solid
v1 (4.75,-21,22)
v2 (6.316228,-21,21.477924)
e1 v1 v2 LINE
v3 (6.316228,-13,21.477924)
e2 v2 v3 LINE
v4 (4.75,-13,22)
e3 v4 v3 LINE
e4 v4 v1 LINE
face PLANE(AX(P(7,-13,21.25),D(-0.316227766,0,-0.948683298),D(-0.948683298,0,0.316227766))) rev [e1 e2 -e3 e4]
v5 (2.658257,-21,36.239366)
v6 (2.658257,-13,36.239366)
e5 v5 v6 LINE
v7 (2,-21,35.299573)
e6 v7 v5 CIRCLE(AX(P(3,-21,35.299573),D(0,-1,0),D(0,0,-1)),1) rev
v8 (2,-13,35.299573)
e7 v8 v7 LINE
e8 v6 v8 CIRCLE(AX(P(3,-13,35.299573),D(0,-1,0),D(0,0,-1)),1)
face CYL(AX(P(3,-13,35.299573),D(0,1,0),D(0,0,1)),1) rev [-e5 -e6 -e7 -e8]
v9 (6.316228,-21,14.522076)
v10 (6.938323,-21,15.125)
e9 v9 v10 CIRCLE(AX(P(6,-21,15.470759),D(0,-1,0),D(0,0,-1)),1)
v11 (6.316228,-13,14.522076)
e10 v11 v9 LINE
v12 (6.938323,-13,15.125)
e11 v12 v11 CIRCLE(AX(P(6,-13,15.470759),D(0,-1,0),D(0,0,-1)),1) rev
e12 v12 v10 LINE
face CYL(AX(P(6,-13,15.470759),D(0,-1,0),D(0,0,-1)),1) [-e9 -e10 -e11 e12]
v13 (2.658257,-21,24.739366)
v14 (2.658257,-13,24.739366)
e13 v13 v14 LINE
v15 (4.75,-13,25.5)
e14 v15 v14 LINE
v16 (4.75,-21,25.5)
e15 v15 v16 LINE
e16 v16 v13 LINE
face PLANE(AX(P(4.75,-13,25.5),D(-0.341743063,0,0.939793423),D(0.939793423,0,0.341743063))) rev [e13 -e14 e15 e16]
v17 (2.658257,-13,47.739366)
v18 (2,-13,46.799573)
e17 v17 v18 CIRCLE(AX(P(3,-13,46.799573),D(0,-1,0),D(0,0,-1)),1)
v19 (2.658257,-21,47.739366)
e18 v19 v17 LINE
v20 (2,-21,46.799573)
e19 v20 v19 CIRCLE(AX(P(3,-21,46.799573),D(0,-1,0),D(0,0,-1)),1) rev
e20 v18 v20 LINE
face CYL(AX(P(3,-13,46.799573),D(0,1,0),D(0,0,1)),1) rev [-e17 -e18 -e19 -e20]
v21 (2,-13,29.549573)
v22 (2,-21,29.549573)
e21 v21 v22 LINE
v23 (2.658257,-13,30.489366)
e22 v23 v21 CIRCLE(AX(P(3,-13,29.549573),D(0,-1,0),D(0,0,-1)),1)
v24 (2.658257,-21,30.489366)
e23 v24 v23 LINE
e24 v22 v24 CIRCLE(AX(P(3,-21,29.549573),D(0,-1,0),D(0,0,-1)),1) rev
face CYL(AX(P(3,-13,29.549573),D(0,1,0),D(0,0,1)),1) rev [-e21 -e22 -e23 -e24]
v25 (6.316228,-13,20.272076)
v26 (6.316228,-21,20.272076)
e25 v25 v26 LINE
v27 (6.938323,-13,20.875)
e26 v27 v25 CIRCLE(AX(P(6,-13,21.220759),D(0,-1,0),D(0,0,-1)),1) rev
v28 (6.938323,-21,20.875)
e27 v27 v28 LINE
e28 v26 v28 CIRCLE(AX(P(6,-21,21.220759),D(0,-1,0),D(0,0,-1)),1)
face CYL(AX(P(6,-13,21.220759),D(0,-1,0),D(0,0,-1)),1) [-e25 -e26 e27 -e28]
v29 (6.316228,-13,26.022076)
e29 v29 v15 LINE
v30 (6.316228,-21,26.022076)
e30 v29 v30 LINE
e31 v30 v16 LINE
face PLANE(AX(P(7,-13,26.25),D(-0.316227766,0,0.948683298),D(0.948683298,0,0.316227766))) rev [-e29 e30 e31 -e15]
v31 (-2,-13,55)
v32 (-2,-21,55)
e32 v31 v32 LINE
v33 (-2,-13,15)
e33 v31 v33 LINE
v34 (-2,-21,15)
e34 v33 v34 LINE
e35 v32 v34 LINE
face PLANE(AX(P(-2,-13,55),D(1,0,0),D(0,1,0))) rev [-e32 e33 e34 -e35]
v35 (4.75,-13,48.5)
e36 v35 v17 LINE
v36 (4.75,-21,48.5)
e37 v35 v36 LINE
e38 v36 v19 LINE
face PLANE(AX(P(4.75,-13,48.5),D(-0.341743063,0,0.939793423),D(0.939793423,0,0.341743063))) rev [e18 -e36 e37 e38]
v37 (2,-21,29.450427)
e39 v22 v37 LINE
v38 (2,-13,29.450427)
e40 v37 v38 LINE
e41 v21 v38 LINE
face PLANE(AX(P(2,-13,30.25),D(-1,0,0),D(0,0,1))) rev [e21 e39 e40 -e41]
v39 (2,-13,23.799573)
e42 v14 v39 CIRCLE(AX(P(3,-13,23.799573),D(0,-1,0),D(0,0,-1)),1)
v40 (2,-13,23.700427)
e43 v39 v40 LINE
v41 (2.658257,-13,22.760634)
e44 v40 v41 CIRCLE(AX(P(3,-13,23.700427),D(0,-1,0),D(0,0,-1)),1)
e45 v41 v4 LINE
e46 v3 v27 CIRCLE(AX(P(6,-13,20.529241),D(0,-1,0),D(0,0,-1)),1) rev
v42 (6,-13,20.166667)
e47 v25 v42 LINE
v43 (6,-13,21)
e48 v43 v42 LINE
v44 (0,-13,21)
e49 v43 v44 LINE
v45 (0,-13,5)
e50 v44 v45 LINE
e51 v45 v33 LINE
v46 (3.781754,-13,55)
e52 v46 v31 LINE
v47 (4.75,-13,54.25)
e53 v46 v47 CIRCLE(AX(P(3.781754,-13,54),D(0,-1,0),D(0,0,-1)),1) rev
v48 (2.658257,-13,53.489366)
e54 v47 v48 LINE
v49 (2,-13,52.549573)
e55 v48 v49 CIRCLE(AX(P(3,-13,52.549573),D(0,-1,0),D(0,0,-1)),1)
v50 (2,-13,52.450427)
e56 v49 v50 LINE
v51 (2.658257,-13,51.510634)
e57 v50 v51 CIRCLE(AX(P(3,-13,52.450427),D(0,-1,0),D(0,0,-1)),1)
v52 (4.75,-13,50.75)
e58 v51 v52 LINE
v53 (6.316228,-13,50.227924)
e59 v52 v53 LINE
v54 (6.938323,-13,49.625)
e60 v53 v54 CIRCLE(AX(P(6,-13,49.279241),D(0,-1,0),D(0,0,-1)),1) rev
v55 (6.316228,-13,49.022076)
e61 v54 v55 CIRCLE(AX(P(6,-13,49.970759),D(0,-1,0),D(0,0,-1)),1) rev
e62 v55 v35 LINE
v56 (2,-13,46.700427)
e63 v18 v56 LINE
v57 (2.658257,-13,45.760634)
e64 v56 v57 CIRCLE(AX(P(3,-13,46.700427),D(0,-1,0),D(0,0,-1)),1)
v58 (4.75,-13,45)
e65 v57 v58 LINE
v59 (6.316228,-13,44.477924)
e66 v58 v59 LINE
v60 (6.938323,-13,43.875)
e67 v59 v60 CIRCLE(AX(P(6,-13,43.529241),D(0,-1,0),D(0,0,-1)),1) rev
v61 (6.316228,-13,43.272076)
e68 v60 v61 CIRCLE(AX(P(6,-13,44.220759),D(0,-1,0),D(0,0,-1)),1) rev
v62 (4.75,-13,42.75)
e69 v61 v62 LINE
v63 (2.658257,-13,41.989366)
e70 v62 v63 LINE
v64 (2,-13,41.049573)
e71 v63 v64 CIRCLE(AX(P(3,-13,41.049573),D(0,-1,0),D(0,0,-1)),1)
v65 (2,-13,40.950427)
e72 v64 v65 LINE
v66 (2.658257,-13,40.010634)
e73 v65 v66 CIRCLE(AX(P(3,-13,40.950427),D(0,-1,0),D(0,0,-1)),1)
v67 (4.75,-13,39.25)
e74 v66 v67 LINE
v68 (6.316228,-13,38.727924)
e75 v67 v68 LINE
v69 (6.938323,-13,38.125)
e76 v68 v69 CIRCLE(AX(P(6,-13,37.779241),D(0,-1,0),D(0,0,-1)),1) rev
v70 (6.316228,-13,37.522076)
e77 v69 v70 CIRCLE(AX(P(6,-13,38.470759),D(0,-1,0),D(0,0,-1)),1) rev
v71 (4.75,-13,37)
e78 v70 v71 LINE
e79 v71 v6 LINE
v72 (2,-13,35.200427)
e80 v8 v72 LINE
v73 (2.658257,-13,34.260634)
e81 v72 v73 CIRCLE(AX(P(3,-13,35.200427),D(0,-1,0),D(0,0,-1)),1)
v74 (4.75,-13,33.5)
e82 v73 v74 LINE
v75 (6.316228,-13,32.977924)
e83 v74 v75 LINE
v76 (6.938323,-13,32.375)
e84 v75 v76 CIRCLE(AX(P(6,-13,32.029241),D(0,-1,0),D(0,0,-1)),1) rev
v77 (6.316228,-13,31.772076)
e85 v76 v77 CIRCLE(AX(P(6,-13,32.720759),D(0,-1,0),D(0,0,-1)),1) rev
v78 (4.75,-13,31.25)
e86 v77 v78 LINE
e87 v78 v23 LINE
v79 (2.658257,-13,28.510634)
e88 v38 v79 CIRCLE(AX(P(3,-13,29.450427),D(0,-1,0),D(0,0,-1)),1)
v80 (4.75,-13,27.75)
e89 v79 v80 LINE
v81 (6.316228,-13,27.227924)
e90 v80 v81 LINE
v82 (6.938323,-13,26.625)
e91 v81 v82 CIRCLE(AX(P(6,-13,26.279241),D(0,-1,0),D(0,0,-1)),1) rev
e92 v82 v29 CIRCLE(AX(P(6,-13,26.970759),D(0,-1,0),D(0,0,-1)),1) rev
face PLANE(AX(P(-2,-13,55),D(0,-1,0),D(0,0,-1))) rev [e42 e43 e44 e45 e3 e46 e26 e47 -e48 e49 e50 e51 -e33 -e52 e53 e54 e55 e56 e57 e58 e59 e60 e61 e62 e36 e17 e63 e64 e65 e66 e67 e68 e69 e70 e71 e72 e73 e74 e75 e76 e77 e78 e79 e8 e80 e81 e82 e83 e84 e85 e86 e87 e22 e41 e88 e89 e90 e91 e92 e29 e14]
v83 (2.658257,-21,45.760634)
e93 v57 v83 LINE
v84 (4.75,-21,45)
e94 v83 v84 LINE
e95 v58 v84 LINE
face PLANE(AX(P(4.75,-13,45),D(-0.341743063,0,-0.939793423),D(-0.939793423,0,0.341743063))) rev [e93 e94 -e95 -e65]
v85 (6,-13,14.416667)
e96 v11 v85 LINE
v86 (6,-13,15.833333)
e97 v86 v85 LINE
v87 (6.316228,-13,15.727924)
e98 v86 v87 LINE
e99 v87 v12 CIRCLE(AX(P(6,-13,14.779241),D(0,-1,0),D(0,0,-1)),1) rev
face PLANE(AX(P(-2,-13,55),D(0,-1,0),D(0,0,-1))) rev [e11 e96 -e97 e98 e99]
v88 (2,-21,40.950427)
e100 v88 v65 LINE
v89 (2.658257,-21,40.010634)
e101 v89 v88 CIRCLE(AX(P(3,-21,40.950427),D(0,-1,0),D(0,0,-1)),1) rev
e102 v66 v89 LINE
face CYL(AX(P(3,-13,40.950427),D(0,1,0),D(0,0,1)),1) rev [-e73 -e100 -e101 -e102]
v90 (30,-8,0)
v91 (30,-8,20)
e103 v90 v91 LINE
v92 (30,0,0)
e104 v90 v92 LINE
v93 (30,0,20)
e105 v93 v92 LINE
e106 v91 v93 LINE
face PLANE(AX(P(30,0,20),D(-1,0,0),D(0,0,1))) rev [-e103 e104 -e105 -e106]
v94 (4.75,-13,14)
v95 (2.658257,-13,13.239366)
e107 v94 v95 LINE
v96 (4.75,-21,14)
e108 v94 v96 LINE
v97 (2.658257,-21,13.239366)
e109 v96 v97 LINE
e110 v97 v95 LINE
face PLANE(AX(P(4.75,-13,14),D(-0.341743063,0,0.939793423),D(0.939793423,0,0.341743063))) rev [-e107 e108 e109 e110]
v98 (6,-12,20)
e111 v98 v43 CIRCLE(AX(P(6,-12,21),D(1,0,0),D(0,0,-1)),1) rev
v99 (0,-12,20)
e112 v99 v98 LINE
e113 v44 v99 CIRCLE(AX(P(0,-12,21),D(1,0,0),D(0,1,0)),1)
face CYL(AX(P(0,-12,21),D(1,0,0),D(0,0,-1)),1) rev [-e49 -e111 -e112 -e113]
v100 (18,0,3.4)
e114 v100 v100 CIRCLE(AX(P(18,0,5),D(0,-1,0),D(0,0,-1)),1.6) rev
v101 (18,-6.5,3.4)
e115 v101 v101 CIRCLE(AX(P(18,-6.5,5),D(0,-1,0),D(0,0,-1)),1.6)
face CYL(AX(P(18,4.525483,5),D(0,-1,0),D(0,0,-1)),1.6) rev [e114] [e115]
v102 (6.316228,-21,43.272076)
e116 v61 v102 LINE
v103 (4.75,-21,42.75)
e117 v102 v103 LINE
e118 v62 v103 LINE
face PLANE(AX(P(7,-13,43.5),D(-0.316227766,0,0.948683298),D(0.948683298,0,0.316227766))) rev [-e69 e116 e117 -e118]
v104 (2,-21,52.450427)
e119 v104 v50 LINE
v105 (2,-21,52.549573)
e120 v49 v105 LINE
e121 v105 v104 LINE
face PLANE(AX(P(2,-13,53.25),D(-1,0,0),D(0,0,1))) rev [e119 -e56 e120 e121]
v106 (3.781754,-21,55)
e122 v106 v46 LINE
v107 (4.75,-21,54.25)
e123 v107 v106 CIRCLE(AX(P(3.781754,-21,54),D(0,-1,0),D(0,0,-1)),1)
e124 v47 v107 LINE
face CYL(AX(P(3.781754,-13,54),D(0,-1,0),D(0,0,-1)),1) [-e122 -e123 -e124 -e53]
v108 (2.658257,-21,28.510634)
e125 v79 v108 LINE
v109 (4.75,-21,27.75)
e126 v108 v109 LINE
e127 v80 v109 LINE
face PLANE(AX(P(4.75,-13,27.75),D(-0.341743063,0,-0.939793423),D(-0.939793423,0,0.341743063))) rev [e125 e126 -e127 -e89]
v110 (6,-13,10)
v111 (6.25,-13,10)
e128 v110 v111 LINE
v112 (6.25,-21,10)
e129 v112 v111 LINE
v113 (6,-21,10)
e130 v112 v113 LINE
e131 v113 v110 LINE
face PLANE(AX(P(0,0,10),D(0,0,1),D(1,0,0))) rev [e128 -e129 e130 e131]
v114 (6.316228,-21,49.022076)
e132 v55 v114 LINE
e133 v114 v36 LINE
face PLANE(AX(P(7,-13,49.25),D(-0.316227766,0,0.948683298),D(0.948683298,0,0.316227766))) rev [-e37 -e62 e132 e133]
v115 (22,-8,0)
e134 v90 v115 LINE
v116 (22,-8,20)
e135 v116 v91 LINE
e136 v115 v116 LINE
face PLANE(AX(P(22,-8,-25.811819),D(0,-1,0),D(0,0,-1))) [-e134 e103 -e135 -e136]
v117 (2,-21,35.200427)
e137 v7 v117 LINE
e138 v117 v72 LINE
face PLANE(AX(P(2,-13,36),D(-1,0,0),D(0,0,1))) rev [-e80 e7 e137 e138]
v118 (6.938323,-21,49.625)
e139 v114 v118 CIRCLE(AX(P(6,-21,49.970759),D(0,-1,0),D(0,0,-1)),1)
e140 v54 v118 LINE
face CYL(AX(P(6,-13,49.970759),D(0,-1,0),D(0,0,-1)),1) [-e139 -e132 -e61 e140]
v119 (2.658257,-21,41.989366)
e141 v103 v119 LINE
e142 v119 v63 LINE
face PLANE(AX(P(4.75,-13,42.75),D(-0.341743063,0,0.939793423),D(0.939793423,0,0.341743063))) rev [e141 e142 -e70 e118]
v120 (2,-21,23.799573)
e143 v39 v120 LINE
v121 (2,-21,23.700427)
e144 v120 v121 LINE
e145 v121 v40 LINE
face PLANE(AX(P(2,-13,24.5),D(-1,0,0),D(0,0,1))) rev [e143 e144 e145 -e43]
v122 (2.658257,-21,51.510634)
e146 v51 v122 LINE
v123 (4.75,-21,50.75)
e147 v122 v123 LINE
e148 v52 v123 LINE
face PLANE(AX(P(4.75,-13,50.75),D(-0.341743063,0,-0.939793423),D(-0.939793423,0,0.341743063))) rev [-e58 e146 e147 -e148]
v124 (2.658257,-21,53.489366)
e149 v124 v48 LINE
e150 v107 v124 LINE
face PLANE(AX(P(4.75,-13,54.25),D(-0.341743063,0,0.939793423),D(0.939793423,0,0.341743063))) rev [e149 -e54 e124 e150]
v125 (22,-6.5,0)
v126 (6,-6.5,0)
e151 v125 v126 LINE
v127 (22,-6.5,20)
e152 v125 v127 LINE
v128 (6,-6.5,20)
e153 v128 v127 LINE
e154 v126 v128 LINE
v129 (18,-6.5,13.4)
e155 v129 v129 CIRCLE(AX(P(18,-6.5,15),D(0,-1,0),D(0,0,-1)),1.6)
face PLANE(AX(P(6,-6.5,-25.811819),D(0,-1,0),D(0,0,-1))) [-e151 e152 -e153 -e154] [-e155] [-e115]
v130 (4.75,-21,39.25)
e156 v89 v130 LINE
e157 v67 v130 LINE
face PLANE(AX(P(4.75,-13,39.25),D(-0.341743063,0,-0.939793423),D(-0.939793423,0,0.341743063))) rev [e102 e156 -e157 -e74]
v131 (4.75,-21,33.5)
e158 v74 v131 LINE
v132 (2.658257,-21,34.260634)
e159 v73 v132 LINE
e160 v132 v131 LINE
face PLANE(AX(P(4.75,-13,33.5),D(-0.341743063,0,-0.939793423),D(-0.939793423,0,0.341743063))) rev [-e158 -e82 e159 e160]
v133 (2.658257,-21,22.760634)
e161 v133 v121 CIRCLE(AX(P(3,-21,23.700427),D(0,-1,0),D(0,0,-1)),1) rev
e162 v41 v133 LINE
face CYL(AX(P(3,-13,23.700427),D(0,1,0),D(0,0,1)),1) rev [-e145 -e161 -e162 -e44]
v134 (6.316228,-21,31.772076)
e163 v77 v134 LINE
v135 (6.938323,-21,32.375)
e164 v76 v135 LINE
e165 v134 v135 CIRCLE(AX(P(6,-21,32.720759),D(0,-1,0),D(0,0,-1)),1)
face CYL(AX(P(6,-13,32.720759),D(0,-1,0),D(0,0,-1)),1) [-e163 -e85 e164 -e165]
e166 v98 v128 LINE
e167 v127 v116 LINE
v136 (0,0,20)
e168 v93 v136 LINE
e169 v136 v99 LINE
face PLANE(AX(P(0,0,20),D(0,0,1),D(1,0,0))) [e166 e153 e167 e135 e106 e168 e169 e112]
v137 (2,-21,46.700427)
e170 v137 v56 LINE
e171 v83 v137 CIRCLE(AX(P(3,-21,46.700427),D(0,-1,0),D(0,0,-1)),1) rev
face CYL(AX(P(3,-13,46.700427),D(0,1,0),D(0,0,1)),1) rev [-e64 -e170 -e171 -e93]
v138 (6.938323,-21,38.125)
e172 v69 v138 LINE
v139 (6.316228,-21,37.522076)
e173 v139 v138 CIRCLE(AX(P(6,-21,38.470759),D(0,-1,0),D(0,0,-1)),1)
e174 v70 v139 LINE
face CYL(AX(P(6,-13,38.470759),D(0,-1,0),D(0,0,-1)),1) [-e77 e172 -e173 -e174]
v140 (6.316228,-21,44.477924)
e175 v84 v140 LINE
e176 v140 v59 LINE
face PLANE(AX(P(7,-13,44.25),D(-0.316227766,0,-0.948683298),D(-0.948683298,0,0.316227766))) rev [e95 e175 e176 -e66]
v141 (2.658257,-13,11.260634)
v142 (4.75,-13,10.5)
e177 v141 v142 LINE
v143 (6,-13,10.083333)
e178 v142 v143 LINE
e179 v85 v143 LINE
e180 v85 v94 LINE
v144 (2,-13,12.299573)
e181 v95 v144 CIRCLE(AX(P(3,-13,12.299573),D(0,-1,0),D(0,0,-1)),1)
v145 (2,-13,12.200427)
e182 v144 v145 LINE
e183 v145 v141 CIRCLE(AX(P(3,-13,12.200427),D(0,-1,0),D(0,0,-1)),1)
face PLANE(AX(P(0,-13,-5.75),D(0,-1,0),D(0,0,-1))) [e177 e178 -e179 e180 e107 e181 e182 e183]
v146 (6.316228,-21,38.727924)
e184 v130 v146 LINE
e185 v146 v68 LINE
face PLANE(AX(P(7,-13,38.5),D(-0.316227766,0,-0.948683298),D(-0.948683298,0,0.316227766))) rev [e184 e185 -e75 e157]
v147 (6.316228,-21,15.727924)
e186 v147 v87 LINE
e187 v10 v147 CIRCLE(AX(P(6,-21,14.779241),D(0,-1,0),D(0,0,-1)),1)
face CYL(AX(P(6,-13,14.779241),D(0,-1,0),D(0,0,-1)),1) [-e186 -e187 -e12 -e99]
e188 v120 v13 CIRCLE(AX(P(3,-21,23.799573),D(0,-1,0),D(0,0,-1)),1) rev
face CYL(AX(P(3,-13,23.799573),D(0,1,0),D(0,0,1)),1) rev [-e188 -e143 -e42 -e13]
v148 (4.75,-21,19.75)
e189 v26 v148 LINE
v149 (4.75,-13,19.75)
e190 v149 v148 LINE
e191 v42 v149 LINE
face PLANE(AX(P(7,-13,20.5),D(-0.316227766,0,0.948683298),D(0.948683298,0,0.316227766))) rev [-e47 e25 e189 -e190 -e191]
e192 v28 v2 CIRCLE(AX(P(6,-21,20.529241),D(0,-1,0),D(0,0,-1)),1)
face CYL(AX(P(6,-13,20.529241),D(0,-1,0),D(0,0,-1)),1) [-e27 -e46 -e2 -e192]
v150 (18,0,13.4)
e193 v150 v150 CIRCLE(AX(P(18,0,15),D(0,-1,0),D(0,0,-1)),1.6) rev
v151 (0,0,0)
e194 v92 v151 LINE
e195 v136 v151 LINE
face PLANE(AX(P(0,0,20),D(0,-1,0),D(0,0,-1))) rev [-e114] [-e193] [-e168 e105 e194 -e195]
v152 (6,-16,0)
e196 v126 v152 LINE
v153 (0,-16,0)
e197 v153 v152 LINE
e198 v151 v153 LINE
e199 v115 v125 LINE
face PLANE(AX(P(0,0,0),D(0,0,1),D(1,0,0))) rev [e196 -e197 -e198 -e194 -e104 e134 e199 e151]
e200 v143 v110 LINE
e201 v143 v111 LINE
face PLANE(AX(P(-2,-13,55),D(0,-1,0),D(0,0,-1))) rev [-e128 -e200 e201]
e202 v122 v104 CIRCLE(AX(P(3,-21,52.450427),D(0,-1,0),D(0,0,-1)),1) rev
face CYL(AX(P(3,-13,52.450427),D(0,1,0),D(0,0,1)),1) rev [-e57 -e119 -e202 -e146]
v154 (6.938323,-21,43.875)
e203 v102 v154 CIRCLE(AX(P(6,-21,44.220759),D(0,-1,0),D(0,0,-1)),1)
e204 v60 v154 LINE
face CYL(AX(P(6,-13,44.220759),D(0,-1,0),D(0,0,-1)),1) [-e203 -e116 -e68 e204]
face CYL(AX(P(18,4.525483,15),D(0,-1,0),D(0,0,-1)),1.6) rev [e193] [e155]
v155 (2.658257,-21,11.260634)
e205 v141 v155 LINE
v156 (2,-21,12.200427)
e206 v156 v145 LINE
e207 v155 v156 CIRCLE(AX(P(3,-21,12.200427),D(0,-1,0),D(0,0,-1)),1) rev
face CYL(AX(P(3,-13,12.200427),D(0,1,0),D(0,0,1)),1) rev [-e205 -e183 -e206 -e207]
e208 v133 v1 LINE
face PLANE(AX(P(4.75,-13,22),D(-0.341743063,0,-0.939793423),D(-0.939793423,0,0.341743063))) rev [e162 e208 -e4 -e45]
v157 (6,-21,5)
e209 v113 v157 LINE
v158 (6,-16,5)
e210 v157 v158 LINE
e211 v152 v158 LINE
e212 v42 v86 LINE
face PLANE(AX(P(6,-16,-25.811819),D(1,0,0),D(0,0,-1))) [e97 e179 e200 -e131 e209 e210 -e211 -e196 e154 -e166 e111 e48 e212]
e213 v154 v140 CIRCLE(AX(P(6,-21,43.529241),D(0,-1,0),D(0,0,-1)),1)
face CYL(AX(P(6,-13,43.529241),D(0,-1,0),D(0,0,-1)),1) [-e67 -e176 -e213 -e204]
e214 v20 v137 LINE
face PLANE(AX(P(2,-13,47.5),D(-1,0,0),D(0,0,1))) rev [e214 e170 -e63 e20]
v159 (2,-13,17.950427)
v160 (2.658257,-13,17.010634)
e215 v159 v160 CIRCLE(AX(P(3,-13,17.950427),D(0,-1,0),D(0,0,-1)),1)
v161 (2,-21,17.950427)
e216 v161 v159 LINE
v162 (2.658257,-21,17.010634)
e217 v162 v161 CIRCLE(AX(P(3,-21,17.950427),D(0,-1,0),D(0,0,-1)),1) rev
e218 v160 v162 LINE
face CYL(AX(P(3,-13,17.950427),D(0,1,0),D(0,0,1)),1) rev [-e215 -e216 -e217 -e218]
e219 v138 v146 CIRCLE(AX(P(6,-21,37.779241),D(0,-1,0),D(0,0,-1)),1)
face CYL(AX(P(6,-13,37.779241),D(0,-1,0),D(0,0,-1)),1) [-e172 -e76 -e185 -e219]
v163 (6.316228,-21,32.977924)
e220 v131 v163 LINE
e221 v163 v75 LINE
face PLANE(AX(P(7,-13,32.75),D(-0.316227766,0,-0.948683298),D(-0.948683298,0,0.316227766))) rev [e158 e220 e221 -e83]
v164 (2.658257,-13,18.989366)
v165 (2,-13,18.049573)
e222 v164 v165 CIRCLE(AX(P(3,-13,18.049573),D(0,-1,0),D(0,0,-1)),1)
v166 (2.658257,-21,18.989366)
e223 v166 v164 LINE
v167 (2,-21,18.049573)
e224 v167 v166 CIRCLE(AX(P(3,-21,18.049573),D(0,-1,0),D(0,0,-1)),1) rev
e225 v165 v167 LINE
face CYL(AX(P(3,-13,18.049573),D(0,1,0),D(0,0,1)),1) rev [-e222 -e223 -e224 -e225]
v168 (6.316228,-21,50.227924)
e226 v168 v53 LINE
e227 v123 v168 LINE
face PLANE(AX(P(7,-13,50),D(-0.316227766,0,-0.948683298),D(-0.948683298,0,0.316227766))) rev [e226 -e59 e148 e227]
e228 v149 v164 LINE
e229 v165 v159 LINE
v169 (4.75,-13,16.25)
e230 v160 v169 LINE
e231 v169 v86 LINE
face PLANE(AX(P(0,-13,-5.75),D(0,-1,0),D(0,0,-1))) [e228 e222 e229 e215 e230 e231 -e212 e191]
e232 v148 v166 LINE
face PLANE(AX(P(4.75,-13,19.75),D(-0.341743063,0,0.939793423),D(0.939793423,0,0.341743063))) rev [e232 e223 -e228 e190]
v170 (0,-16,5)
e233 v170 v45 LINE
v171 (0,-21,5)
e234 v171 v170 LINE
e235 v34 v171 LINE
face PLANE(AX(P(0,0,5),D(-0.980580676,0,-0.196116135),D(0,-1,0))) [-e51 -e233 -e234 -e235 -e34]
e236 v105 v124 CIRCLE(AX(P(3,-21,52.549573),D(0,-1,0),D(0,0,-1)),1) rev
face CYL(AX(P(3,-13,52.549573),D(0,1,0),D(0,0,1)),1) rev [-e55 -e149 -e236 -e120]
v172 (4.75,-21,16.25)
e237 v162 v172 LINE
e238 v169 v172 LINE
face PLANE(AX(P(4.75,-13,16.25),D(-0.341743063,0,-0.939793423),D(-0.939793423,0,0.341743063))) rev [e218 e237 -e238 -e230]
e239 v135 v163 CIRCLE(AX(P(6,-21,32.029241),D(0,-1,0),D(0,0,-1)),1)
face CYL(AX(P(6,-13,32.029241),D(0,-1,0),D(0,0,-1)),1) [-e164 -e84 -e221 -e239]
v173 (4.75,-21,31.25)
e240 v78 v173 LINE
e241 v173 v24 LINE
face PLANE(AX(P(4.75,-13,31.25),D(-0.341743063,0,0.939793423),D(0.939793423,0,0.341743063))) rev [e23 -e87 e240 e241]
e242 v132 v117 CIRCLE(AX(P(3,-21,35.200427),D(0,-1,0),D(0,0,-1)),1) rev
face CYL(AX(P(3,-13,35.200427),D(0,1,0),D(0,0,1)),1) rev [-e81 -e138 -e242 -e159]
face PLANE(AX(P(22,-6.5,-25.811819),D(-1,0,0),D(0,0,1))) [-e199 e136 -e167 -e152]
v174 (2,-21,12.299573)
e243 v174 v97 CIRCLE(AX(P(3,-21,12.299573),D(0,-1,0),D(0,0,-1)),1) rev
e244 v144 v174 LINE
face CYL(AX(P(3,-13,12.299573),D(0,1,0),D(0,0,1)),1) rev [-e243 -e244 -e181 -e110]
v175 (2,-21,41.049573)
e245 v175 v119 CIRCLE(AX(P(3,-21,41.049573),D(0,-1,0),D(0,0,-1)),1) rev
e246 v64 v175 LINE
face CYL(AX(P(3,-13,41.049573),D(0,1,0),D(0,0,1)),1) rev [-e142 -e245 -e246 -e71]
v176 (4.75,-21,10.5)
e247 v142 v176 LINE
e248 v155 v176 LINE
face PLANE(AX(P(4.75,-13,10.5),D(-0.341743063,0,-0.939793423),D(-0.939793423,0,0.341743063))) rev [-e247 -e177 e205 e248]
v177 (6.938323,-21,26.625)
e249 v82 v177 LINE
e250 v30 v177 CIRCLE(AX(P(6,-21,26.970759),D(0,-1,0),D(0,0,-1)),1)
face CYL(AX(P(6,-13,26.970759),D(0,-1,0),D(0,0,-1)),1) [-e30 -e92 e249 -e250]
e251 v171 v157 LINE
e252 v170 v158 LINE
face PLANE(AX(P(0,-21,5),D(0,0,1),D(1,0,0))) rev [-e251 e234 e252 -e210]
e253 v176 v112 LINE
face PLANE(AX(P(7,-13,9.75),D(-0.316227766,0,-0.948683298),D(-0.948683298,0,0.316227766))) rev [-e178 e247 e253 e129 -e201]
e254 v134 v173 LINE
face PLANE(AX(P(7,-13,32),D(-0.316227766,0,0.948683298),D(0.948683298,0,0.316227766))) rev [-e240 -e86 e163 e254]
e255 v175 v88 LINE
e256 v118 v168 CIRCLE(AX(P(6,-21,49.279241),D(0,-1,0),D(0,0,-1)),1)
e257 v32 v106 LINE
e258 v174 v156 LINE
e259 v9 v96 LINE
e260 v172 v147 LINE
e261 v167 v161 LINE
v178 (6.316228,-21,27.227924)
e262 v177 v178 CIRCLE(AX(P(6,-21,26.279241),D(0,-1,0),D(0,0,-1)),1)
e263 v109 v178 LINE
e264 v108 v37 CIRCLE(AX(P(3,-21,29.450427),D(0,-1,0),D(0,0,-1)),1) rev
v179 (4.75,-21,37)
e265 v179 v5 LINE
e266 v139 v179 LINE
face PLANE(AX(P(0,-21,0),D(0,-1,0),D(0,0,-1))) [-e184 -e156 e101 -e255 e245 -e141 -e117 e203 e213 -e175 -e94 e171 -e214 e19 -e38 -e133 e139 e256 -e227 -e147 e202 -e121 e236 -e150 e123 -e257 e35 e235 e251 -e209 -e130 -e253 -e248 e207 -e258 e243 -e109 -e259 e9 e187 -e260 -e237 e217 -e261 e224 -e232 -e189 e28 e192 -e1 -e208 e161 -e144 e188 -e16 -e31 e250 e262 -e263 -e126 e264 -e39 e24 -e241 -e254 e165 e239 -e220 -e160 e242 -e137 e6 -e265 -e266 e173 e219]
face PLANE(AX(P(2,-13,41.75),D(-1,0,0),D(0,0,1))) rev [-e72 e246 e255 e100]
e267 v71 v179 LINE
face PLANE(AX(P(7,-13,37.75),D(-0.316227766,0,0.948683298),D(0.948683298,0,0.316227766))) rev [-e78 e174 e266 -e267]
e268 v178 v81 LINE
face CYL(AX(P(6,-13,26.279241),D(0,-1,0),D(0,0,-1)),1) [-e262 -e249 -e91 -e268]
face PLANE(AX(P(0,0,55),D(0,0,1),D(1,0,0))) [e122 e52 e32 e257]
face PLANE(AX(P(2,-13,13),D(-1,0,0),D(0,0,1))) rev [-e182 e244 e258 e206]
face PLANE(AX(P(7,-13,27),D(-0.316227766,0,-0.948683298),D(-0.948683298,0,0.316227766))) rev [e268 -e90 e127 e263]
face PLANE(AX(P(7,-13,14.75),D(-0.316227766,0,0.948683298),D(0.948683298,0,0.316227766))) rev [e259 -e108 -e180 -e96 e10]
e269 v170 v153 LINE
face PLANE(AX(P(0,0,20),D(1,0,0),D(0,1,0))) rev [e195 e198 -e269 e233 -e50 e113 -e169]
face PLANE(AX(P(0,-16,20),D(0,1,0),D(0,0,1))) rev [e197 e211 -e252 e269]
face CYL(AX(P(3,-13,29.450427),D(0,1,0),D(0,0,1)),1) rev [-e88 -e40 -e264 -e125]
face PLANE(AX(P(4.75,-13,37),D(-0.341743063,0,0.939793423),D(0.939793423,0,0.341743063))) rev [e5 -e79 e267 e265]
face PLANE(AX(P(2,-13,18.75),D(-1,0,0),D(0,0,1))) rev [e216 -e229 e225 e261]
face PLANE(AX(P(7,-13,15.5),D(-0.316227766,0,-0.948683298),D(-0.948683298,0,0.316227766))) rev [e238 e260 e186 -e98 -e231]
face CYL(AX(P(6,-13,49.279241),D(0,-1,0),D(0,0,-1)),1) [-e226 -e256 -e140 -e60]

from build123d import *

# Parameters (mm, degrees)
SKETCH1_W           = 30
SKETCH1_H           = 16
BOSS_EXTRUDE1_DEPTH = 20
CUT_EXTRUDE1_DEPTH  = 20
SKETCH3_W           = 6
SKETCH3_H           = 10
BOSS_EXTRUDE2_DEPTH = 5
SKETCH9_R           = 1.6
CUT_EXTRUDE3_DEPTH  = 6.5
SKETCH11_W          = 10
SKETCH11_H          = 8
BOSS_EXTRUDE4_DEPTH = 40
CHAMFER2_SIZE2      = 10
CHAMFER2_SIZE       = 2
FILLET1_R           = 1
CUT_EXTRUDE4_DEPTH  = 8
SKETCH13_W          = 2
SKETCH13_H          = 8
BOSS_EXTRUDE5_DEPTH = 10
LPATTERN1_COUNT     = 8
LPATTERN1_PITCH     = 5.75
FILLET2_R           = 1
FILLET3_R           = 1
SKETCH14_W          = 2
SKETCH14_H          = 8
CUT_EXTRUDE5_DEPTH  = 5


# Some blends are built 0.0001 mm under size
with BuildPart() as part:
    # Sketch1 → Boss-Extrude1 (new body)
    with BuildSketch(Plane.XY):
        with Locations((15, -8)):
            Rectangle(SKETCH1_W, SKETCH1_H)
    extrude(amount=BOSS_EXTRUDE1_DEPTH)

    # Sketch2 → Cut-Extrude1 (cut)
    with BuildSketch(Plane.XY.offset(20)):
        Polygon((22, -6.5), (22, -8), (30, -8), (30, -16), (6, -16), (6, -6.5), align=None)
    extrude(amount=-CUT_EXTRUDE1_DEPTH, mode=Mode.SUBTRACT)

    # Sketch3 → Boss-Extrude2 (add)
    with BuildSketch(Plane.XZ.offset(16)):
        with Locations((3, 10)):
            Rectangle(SKETCH3_W, SKETCH3_H)
    extrude(amount=BOSS_EXTRUDE2_DEPTH)

    # Sketch9 → Cut-Extrude3 (cut)
    with BuildSketch(Plane.XZ.offset(6.5)):
        with Locations(Location((18, 15, 0), (0, 0, 270))):
            Circle(SKETCH9_R)
        with Locations(Location((18, 5, 0), (0, 0, 270))):
            Circle(SKETCH9_R)
    extrude(amount=-CUT_EXTRUDE3_DEPTH, mode=Mode.SUBTRACT)

    # Sketch11 → Boss-Extrude4 (add)
    with BuildSketch(Plane.XY.offset(15)):
        with Locations((3, -17)):
            Rectangle(SKETCH11_W, SKETCH11_H)
    extrude(amount=BOSS_EXTRUDE4_DEPTH)

    # Chamfer2
    chamfer2_edges = [part.edges().sort_by_distance(p)[0] for p in [
        (0, -17, 15),
    ]]
    chamfer2_side = [part.faces().sort_by_distance(p)[0] for p in [
        (-0.04, -17, 15),
    ]]
    chamfer(chamfer2_edges, length=CHAMFER2_SIZE - 0.0001, length2=CHAMFER2_SIZE2 - 0.0001, reference=chamfer2_side[0])  # a hair under: the kernel refuses the full size

    # Fillet1
    fillet1_edges = [part.edges().sort_by_distance(p)[0] for p in [
        (3, -13, 20),
    ]]
    fillet(fillet1_edges, radius=FILLET1_R)

    # Sketch12 → Cut-Extrude4 (cut)
    with BuildSketch(Plane.XZ.offset(21)):
        Polygon((7, 55), (4.75, 54.25), (2, 53.25), (2, 51.75), (4.75, 50.75), (7, 50), (7, 49.25), (8, 49.25), (8, 55), align=None)
    cut_extrude4 = extrude(amount=-CUT_EXTRUDE4_DEPTH, mode=Mode.SUBTRACT)

    # Sketch13 → Boss-Extrude5 (add)
    with BuildSketch(Plane(origin=(0, 0, 15), x_dir=(-1, 0, 0), z_dir=(0, 0, -1))):
        with Locations((-7, -17)):
            Rectangle(SKETCH13_W, SKETCH13_H)
    extrude(amount=BOSS_EXTRUDE5_DEPTH)

    # LPattern1: Cut-Extrude4 ×8
    with Locations(*[(0, 0, -i * LPATTERN1_PITCH) for i in range(1, LPATTERN1_COUNT)]):
        add(cut_extrude4, mode=Mode.SUBTRACT)

    # Fillet2
    # the kernel refuses this fillet: 1 mm, written as the material it adds along each edge
    with BuildSketch(Plane(origin=(2, -21, 51.75), x_dir=(0.9397934234884382, 0, -0.3417430630867014), z_dir=(0, 1, 0)), Plane(origin=(2, -21, 53.25), x_dir=(0, 0, -1), z_dir=(0, 1, 0)), Plane(origin=(2, -21, 46), x_dir=(0.9397934234884356, 0, -0.34174306308670804), z_dir=(0, 1, 0)), Plane(origin=(2, -21, 47.5), x_dir=(0, 0, -1), z_dir=(0, 1, 0)), Plane(origin=(2, -21, 40.25), x_dir=(0.9397934234884383, 0, -0.3417430630867007), z_dir=(0, 1, 0)), Plane(origin=(2, -21, 41.75), x_dir=(0, 0, -1), z_dir=(0, 1, 0)), Plane(origin=(2, -21, 28.75), x_dir=(0.939793423488437, 0, -0.3417430630867048), z_dir=(0, 1, 0)), Plane(origin=(2, -21, 30.25), x_dir=(0, 0, -1), z_dir=(0, 1, 0)), Plane(origin=(2, -21, 34.5), x_dir=(0.9397934234884383, 0, -0.3417430630867007), z_dir=(0, 1, 0)), Plane(origin=(2, -21, 36), x_dir=(0, 0, -1), z_dir=(0, 1, 0)), Plane(origin=(2, -21, 24.5), x_dir=(0, 0, -1), z_dir=(0, 1, 0)), Plane(origin=(2, -21, 23), x_dir=(0.939793423488437, 0, -0.3417430630867048), z_dir=(0, 1, 0))) as fillet2_piece_1:
        with BuildLine():
            CenterArc((FILLET2_R * 0.700427264611, -FILLET2_R), FILLET2_R, 90, 70.016893478)
            Line((-FILLET2_R * 0.239366158878, -FILLET2_R * 0.658256936913), (0, 0))
            Line((0, 0), (FILLET2_R * 0.700427264611, 0))
        make_face()
    extrude(amount=8)
    with BuildSketch(Plane(origin=(2, -21, 11.5), x_dir=(0.939793423488437, 0, -0.3417430630867044), z_dir=(0, 1, 0)), Plane(origin=(2, -21, 13), x_dir=(0, 0, -1), z_dir=(0, 1, 0)), Plane(origin=(2, -21, 17.25), x_dir=(0.939793423488437, 0, -0.3417430630867048), z_dir=(0, 1, 0))) as fillet2_piece_2:
        with BuildLine():
            CenterArc((FILLET2_R * 0.700427264611, -FILLET2_R), FILLET2_R, 90, 70.016893478)
            Line((-FILLET2_R * 0.239366158878, -FILLET2_R * 0.658256936913), (0, 0))
            Line((0, 0), (FILLET2_R * 0.700427264611, 0))
        make_face()
    extrude(amount=9.751068162)
    with BuildSketch(Plane(origin=(2, -21, 18.75), x_dir=(0.9397934234884369, 0, 0.34174306308670505), z_dir=(0, 1, 0))) as fillet2_piece_3:
        with BuildLine():
            CenterArc((FILLET2_R * 0.700427264611, FILLET2_R), FILLET2_R, 199.983106522, 70.016893478)
            Line((-FILLET2_R * 0.239366158878, FILLET2_R * 0.658256936913), (0, 0))
            Line((0, 0), (FILLET2_R * 0.700427264611, 0))
        make_face()
    extrude(amount=9.751068162)
    # the kernel refuses this fillet: 1 mm, written as the material it takes off along each edge
    with BuildSketch(Plane(origin=(7, -22.80189805, 26.25), x_dir=(-0.9486832980505139, 0, -0.31622776601683794), z_dir=(0, 1, 0)), Plane(origin=(7, -22.80189805, 27), x_dir=(0, 0, -1), z_dir=(0, 1, 0)), Plane(origin=(7, -22.80189805, 32), x_dir=(-0.9486832980505122, 0, -0.31622776601684277), z_dir=(0, 1, 0)), Plane(origin=(7, -22.80189805, 32.75), x_dir=(0, 0, -1), z_dir=(0, 1, 0)), Plane(origin=(7, -22.80189805, 37.75), x_dir=(-0.9486832980505133, 0, -0.31622776601683944), z_dir=(0, 1, 0)), Plane(origin=(7, -22.80189805, 38.5), x_dir=(0, 0, -1), z_dir=(0, 1, 0)), Plane(origin=(7, -22.80189805, 43.5), x_dir=(-0.9486832980505137, 0, -0.31622776601683833), z_dir=(0, 1, 0)), Plane(origin=(7, -22.80189805, 44.25), x_dir=(0, 0, -1), z_dir=(0, 1, 0)), Plane(origin=(7, -22.80189805, 49.25), x_dir=(-0.9486832980505137, 0, -0.31622776601683833), z_dir=(0, 1, 0)), Plane(origin=(7, -22.80189805, 50), x_dir=(0, 0, -1), z_dir=(0, 1, 0)), Plane(origin=(7, -22.80189805, 14.75), x_dir=(-0.9486832980505139, 0, -0.31622776601683794), z_dir=(0, 1, 0)), Plane(origin=(7, -22.80189805, 15.5), x_dir=(0, 0, -1), z_dir=(0, 1, 0)), Plane(origin=(7, -22.80189805, 20.5), x_dir=(-0.9486832980505137, 0, -0.3162277660168387), z_dir=(0, 1, 0)), Plane(origin=(7, -22.80189805, 21.25), x_dir=(0, 0, -1), z_dir=(0, 1, 0))) as fillet2_2_piece_1:
        with BuildLine():
            CenterArc((FILLET2_R * 0.720759220056, FILLET2_R), FILLET2_R, 198.434948823, 71.565051177)
            Line((-FILLET2_R * 0.227924077994, FILLET2_R * 0.683772233983), (0, 0))
            Line((0, 0), (FILLET2_R * 0.720759220056, 0))
        make_face()
    extrude(amount=11.6037961, mode=Mode.SUBTRACT)

    # Fillet3
    # the kernel refuses this fillet: 1 mm, written as the material it takes off along each edge
    with BuildSketch(Plane(origin=(7, -29.045614591, 55), x_dir=(-1, 0, 0), z_dir=(0, 1, 0))) as fillet3_piece_1:
        with BuildLine():
            CenterArc((3.218245837, -1), FILLET3_R, 90, 75.522487814)
            Line((2.25, -0.75), (2.230635083, -0.745))
            ThreePointArc((2.230635083, -0.745), (1.118675445, -0.393973666), (-0.006324555, -0.018973666))
            Line((-0.006324555, -0.018973666), (0, 0.02))
            Line((0, 0.02), (3.218245837, 0.02))
            Line((3.218245837, 0.02), (3.218245837, 0))
        make_face()
    extrude(amount=24.091229183, mode=Mode.SUBTRACT)

    # Sketch14 → Cut-Extrude5 (cut)
    with BuildSketch(Plane(origin=(0, 0, 5), x_dir=(-1, 0, 0), z_dir=(0, 0, -1))):
        with Locations((-7, -17)):
            Rectangle(SKETCH14_W, SKETCH14_H)
    extrude(amount=-CUT_EXTRUDE5_DEPTH, mode=Mode.SUBTRACT)


solid = part.part
